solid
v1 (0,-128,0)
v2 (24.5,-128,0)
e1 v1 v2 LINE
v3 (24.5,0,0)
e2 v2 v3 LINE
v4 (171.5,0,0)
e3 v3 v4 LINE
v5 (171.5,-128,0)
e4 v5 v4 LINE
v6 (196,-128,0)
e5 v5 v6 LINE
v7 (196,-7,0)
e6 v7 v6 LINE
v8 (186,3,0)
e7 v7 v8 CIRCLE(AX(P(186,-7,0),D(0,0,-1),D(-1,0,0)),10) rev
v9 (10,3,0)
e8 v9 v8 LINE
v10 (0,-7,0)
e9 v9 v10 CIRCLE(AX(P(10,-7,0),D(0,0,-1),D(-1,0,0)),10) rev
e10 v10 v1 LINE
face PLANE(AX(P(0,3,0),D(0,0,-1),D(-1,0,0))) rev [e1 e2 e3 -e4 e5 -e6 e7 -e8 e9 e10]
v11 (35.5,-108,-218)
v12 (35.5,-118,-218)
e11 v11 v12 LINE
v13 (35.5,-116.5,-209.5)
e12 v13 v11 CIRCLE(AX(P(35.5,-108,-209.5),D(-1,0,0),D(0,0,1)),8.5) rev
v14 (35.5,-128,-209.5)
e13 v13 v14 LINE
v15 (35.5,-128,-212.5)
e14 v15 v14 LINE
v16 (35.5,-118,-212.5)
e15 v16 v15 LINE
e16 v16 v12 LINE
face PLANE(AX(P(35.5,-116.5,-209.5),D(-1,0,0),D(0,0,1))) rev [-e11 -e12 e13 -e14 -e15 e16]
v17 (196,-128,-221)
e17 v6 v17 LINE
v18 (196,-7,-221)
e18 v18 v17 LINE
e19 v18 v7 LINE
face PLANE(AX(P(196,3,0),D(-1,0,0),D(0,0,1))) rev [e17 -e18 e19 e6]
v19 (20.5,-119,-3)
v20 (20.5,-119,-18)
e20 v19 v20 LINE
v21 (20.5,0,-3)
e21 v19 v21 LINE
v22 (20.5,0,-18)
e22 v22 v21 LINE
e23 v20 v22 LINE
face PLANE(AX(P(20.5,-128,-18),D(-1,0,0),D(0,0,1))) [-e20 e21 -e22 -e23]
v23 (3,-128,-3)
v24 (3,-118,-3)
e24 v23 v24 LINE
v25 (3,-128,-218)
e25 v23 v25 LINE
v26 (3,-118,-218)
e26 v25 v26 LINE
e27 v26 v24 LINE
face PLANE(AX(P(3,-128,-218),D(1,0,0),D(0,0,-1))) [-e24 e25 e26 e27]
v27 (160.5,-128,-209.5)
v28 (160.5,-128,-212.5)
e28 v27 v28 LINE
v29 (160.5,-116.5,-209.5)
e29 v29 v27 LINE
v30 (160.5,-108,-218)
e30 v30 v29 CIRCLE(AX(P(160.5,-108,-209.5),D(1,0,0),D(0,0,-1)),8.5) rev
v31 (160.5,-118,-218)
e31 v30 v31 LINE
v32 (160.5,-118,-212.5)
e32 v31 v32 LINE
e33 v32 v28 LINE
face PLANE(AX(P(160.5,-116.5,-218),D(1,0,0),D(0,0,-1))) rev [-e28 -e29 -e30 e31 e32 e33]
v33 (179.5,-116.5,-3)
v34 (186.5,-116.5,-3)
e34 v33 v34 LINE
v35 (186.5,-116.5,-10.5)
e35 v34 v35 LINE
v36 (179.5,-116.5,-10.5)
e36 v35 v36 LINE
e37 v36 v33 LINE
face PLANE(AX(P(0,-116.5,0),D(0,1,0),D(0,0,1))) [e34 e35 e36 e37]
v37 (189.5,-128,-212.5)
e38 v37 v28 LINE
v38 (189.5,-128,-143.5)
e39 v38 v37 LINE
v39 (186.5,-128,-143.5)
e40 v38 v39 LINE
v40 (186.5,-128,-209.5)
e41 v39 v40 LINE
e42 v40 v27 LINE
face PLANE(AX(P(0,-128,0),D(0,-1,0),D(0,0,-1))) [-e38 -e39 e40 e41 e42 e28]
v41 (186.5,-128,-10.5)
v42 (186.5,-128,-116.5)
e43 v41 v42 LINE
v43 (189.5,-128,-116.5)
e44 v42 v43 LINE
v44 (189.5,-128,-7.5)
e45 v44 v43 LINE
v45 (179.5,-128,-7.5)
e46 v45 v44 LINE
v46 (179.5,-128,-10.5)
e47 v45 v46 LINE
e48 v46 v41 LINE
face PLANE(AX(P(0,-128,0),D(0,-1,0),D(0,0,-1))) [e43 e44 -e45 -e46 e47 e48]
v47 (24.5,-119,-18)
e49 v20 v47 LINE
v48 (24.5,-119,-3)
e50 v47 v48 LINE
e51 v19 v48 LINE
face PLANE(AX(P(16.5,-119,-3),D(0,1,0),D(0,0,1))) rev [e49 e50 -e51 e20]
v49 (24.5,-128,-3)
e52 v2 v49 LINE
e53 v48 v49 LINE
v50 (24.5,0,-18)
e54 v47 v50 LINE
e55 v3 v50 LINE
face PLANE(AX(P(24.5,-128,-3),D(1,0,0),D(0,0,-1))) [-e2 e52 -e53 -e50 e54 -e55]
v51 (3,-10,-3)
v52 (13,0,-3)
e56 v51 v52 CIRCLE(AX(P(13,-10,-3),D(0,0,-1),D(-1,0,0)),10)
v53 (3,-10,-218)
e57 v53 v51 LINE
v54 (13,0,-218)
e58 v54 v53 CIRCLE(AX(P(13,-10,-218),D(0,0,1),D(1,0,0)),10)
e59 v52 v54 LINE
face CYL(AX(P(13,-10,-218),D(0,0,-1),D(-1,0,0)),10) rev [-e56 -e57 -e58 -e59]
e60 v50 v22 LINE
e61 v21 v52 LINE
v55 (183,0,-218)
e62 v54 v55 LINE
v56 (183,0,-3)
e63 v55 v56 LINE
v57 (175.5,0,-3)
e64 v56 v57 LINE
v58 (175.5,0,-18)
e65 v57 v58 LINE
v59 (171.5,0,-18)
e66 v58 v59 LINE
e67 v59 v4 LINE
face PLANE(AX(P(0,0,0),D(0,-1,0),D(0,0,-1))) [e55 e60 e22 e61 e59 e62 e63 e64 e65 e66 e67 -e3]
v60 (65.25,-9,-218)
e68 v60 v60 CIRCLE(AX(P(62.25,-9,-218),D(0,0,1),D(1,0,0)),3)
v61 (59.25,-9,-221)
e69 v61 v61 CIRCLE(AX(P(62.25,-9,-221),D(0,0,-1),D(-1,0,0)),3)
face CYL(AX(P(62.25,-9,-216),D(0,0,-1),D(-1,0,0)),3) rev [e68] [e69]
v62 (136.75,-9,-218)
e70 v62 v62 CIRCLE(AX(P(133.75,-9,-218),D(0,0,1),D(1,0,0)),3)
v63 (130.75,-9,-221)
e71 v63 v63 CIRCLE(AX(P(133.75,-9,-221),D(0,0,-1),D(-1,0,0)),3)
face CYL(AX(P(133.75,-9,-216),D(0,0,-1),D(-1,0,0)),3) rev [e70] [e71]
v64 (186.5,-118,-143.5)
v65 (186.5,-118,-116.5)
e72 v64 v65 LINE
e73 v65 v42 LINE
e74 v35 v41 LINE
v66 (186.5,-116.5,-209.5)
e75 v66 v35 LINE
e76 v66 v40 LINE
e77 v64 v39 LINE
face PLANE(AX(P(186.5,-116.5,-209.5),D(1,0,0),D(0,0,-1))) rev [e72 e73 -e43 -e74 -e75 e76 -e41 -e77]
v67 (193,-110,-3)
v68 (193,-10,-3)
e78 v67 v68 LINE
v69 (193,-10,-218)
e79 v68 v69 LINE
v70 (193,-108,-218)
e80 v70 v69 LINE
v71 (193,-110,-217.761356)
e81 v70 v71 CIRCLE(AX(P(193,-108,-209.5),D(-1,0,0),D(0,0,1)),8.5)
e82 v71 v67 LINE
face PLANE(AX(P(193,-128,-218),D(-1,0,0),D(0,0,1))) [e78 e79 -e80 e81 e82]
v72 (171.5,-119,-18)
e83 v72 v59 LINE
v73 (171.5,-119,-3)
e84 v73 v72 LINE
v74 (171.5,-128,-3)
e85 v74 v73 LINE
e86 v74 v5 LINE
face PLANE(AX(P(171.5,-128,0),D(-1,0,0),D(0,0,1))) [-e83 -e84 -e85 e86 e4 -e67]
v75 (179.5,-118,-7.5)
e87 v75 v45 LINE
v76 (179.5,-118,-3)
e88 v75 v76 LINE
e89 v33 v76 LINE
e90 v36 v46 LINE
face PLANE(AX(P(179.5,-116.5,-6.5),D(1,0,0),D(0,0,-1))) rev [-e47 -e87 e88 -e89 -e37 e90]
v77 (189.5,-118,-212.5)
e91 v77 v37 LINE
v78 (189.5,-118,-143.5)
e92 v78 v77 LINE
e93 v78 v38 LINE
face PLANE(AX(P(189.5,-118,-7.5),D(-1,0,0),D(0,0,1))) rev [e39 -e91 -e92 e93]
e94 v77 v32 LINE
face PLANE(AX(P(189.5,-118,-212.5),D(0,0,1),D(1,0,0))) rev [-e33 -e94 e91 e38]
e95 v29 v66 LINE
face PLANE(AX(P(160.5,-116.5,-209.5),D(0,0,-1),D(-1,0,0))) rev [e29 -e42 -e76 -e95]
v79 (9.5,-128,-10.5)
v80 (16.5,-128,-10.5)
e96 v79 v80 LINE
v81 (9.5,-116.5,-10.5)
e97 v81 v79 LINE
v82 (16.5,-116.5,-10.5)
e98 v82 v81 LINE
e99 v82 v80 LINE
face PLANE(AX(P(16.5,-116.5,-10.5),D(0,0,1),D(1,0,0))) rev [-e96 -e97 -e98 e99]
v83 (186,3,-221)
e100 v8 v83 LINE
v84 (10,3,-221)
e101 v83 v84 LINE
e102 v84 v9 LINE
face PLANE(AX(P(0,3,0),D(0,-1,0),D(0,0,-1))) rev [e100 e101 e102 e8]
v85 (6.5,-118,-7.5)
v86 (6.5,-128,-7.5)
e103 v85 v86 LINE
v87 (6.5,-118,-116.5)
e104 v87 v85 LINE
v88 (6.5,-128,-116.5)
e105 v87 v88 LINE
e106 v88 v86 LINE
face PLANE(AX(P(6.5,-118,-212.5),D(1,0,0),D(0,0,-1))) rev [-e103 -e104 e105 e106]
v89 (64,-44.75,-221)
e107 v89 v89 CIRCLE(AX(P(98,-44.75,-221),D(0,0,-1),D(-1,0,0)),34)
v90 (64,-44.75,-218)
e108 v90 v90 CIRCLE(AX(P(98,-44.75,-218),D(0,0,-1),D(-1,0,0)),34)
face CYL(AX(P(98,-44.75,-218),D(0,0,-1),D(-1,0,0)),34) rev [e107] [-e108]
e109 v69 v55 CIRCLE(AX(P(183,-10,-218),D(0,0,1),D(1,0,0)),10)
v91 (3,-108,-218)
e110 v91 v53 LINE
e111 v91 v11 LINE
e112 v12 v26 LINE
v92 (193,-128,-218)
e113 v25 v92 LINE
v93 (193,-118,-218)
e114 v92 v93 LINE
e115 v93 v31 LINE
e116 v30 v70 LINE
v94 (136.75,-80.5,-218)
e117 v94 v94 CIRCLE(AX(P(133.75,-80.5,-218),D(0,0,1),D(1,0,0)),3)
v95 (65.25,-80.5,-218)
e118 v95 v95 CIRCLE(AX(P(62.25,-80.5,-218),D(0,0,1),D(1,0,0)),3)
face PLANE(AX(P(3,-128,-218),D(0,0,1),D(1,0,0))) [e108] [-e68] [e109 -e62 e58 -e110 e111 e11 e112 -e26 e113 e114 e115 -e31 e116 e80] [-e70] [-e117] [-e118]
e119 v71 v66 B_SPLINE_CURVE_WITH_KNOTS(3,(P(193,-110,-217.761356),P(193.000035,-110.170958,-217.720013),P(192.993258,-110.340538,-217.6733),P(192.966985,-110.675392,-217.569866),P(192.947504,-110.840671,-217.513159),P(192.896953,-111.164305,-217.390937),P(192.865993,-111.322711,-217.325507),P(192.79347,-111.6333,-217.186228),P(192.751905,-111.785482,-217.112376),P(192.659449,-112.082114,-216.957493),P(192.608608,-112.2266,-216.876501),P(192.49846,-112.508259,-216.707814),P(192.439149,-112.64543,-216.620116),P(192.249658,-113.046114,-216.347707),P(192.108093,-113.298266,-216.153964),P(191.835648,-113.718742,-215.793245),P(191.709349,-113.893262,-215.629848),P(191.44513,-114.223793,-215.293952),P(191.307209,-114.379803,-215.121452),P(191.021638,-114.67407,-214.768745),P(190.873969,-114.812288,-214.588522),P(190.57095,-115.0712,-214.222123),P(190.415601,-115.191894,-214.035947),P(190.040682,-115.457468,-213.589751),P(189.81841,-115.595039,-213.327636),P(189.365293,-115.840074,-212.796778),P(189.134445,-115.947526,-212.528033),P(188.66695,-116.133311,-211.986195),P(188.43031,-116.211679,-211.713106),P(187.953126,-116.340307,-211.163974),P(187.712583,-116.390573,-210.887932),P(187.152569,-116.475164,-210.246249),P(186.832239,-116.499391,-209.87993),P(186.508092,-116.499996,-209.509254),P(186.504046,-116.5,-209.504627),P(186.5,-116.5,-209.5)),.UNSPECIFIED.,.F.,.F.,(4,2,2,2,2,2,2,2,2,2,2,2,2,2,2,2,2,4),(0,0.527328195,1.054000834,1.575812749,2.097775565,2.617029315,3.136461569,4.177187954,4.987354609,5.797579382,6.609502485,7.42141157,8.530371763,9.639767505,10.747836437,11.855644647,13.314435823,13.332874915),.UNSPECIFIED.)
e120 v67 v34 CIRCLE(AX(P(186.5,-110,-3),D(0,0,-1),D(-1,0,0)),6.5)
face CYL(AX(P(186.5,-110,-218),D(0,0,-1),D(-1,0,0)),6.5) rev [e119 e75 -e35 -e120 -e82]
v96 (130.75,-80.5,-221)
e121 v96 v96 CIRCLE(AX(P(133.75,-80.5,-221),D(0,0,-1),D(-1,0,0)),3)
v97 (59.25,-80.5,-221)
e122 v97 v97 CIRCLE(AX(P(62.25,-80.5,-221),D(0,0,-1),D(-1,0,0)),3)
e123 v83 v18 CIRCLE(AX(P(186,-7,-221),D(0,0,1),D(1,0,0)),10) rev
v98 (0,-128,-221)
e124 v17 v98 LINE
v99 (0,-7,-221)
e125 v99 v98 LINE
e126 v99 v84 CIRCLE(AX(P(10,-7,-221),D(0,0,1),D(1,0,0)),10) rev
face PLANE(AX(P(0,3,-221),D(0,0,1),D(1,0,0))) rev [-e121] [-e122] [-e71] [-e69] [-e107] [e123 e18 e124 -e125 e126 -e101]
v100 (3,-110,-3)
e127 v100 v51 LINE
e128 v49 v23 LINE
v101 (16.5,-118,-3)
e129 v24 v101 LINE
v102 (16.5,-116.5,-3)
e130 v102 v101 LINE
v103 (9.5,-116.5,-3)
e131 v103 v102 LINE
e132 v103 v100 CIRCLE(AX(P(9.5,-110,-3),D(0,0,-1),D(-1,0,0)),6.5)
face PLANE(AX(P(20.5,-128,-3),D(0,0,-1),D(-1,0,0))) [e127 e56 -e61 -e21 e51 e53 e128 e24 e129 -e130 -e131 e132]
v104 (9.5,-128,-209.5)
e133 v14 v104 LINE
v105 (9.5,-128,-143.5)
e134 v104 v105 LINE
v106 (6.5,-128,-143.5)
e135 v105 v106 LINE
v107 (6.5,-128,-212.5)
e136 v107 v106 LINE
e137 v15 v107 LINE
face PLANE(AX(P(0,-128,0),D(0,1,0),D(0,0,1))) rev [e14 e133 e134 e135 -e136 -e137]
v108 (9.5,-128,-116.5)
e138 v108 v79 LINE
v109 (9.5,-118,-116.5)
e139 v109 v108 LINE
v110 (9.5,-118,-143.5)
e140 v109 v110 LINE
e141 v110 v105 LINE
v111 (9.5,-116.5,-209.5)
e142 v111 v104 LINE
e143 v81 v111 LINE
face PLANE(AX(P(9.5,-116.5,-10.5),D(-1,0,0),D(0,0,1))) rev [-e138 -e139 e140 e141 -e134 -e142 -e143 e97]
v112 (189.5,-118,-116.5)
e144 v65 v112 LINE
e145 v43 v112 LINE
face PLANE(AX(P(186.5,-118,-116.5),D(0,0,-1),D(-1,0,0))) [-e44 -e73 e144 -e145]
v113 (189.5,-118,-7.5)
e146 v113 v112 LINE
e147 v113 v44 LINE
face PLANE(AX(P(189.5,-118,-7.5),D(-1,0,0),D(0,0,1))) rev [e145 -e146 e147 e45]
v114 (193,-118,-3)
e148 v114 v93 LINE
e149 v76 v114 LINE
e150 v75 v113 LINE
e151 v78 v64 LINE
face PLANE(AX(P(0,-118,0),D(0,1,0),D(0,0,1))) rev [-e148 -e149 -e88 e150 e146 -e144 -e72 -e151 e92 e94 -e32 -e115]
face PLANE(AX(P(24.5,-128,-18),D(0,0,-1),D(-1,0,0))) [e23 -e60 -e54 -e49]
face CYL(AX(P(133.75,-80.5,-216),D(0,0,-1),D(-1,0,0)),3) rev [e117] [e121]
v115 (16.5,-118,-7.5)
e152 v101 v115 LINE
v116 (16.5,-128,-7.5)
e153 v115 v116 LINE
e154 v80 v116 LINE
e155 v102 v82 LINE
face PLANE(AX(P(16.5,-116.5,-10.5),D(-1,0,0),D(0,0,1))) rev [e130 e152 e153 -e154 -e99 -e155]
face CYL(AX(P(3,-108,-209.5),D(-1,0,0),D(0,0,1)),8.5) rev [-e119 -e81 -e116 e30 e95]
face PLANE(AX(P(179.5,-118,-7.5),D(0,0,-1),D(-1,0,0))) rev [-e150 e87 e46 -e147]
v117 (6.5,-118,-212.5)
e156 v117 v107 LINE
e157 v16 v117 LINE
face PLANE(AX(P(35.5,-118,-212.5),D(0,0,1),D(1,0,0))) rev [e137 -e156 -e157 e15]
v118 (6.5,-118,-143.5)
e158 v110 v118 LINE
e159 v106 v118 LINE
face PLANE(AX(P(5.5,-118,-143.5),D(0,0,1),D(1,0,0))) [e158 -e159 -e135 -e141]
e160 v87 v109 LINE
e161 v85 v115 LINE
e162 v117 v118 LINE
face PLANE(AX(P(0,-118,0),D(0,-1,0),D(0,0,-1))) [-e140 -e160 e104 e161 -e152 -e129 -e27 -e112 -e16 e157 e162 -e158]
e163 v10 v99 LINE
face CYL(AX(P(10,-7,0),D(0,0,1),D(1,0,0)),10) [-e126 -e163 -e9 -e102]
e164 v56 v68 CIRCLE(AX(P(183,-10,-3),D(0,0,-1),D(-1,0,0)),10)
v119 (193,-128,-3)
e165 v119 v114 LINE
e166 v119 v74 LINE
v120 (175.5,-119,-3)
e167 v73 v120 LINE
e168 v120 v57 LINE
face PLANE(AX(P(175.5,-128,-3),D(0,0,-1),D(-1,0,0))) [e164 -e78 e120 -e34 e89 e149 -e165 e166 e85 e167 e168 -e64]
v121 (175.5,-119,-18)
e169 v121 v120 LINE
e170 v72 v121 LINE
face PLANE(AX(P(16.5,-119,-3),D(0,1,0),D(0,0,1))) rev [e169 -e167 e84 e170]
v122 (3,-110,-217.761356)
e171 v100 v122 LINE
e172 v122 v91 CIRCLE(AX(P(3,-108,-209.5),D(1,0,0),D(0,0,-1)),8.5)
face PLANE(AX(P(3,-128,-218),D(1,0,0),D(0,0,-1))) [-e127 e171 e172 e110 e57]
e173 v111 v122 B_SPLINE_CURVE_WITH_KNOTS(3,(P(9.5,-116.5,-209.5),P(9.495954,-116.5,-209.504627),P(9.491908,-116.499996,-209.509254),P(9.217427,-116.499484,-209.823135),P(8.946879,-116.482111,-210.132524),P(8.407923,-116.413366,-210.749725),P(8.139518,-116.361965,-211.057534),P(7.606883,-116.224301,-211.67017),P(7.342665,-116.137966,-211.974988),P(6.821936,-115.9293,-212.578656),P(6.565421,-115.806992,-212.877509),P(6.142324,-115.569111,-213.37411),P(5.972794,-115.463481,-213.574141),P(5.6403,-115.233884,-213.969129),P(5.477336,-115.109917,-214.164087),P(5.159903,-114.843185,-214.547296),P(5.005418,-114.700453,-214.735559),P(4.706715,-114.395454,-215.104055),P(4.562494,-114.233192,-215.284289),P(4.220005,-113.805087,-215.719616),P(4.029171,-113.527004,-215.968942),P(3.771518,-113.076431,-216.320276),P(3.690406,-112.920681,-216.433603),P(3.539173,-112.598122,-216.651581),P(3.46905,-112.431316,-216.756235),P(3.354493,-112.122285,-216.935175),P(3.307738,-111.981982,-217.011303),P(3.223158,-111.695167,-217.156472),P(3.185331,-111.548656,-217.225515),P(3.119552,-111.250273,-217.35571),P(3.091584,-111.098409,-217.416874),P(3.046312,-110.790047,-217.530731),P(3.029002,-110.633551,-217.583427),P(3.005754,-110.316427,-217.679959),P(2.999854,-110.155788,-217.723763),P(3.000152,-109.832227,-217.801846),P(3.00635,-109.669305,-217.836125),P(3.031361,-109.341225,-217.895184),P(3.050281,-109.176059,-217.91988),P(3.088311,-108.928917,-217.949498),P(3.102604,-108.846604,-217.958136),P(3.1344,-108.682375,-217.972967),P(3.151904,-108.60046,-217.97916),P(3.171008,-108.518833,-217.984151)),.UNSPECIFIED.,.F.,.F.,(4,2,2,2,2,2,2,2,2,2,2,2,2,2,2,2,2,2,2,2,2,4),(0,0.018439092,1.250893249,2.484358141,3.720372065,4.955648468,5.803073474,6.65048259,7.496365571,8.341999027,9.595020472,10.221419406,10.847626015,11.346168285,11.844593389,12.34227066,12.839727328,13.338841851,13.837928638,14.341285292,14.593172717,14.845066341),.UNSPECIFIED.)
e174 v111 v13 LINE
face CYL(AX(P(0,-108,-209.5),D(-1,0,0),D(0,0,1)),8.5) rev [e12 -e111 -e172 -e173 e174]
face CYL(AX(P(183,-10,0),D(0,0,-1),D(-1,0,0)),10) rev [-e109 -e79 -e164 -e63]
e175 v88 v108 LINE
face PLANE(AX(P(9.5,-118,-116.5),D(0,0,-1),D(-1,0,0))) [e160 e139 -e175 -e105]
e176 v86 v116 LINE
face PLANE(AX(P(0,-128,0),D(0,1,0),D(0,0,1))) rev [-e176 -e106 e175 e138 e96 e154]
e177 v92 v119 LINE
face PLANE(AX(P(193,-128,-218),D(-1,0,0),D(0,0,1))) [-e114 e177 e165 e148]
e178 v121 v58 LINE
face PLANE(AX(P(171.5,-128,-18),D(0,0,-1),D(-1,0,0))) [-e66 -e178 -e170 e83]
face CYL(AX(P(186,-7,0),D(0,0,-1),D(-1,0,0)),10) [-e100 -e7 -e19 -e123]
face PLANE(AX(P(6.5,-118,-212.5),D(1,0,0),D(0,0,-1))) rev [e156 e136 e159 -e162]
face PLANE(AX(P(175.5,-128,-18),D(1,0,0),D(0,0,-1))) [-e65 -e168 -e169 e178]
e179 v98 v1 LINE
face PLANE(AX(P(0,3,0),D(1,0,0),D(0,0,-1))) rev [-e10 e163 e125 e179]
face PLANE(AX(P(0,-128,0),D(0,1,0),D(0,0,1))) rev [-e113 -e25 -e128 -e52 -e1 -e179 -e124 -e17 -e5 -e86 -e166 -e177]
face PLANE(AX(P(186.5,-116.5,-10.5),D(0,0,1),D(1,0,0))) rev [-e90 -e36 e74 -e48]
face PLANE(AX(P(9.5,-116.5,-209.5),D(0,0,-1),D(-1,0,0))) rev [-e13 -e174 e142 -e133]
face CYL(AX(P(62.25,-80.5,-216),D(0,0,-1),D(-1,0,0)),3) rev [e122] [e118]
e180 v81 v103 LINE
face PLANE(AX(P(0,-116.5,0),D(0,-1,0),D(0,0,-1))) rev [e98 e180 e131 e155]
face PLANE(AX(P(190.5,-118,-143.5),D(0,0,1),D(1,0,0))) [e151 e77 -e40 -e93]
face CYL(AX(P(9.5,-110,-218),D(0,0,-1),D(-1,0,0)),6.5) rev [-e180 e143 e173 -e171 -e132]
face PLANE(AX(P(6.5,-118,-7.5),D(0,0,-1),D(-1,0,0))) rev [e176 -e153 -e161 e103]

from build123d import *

# Parameters (mm, degrees)
SKETCH_1_W          = 196
SKETCH_1_H          = 221
EXTRUDE_1_DEPTH     = 3
EXTRUDE_2_DEPTH     = 128
FILLET_1_R          = 10
FILLET_2_R          = 10
SKETCH_3_R          = 3
SKETCH_3_R_2        = 40
CUT_EXTRUDE_1_DEPTH = 5
FILLET_3_R          = 10
FILLET_4_R          = 10
SKETCH_5_R          = 40
SKETCH_5_R_2        = 34
EXTRUDE_3_DEPTH     = 3
SKETCH_6_W          = 15
SKETCH_6_H          = 9
CUT_EXTRUDE_3_DEPTH = 159
EXTRUDE_4_DEPTH     = 10
EXTRUDE_4_2_DEPTH   = 10
EXTRUDE_4_3_DEPTH   = 10
EXTRUDE_4_4_DEPTH   = 10
EXTRUDE_6_DEPTH     = 1.5
FILLET_START        = -219
FILLET_6_DEPTH      = 216
FILLET_7_R          = 6.5
FILLET_8_R          = 8.5
FILLET_9_R          = 8.5
CUT_EXTRUDE_4_DEPTH = 10


with BuildPart() as part:
    # 草图1 → 凸台-拉伸1 (new body)
    with BuildSketch(Plane(origin=(0, 0, 0), x_dir=(1, 0, 0), z_dir=(0, 1, 0))):
        with Locations((98, 110.5)):
            Rectangle(SKETCH_1_W, SKETCH_1_H)
    extrude(amount=EXTRUDE_1_DEPTH)

    # 草图2 → 凸台-拉伸2 (add)
    with BuildSketch(Plane(origin=(0, 0, 0), x_dir=(1, 0, 0), z_dir=(0, 1, 0))):
        Polygon((3, 218), (3, 3), (20.5, 3), (20.5, 18), (24.5, 18), (24.5, 3), (24.5, 0), (0, 0), (0, 221), (196, 221), (196, 0), (171.5, 0), (171.5, 3), (171.5, 18), (175.5, 18), (175.5, 3), (193, 3), (193, 218), align=None)
    extrude(amount=-EXTRUDE_2_DEPTH)

    # 圆角1
    fillet_1_edges = [part.edges().sort_by_distance(p)[0] for p in [
        (0, 3, -110.5),
    ]]
    fillet(fillet_1_edges, radius=FILLET_1_R)

    # 圆角2
    fillet_2_edges = [part.edges().sort_by_distance(p)[0] for p in [
        (196, 3, -110.5),
    ]]
    fillet(fillet_2_edges, radius=FILLET_2_R)

    # 草图3 → 切除-拉伸1 (cut)
    with BuildSketch(Plane(origin=(0, 0, -221), x_dir=(-1, 0, 0), z_dir=(0, 0, -1))):
        with Locations((-133.75, -9)):
            Circle(SKETCH_3_R)
        with Locations((-62.25, -9)):
            Circle(SKETCH_3_R)
        with Locations((-62.25, -80.5)):
            Circle(SKETCH_3_R)
        with Locations((-133.75, -80.5)):
            Circle(SKETCH_3_R)
        with Locations((-98, -44.75)):
            Circle(SKETCH_3_R_2)
    extrude(amount=-CUT_EXTRUDE_1_DEPTH, mode=Mode.SUBTRACT)

    # 圆角3
    fillet_3_edges = [part.edges().sort_by_distance(p)[0] for p in [
        (193, 0, -110.5),
    ]]
    fillet(fillet_3_edges, radius=FILLET_3_R)

    # 圆角4
    fillet_4_edges = [part.edges().sort_by_distance(p)[0] for p in [
        (3, 0, -110.5),
    ]]
    fillet(fillet_4_edges, radius=FILLET_4_R)

    # 草图5 → 凸台-拉伸3 (add)
    with BuildSketch(Plane(origin=(0, 0, -221), x_dir=(-1, 0, 0), z_dir=(0, 0, -1))):
        with Locations((-98, -44.75)):
            Circle(SKETCH_5_R)
        with Locations((-98, -44.75)):
            Circle(SKETCH_5_R_2, mode=Mode.SUBTRACT)
    extrude(amount=-EXTRUDE_3_DEPTH)

    # 草图6 → 切除-拉伸3 (cut)
    with BuildSketch(Plane(origin=(175.5, 0, 0), x_dir=(0, 0, -1), z_dir=(1, 0, 0))):
        with Locations((10.5, -123.5)):
            Rectangle(SKETCH_6_W, SKETCH_6_H)
    extrude(amount=-CUT_EXTRUDE_3_DEPTH, mode=Mode.SUBTRACT)



with BuildPart() as body_2:
    # 草图10 → 凸台-拉伸4 (new body)
    with BuildSketch(Plane(origin=(0, -128, 0), x_dir=(-1, 0, 0), z_dir=(0, -1, 0))):
        Polygon((-5.5, 213.5), (-5.5, 143.5), (-9.5, 143.5), (-9.5, 209.5), (-35.5, 209.5), (-35.5, 213.5), align=None)
    extrude(amount=-EXTRUDE_4_DEPTH)


with BuildPart() as body_3:
    # 草图10 → Extrude 4 2 (new body)
    with BuildSketch(Plane(origin=(0, -128, 0), x_dir=(-1, 0, 0), z_dir=(0, -1, 0))):
        Polygon((-190.5, 213.5), (-160.5, 213.5), (-160.5, 209.5), (-186.5, 209.5), (-186.5, 143.5), (-190.5, 143.5), align=None)
    extrude(amount=-EXTRUDE_4_2_DEPTH)


with BuildPart() as body_4:
    # 草图10 → Extrude 4 3 (new body)
    with BuildSketch(Plane(origin=(0, -128, 0), x_dir=(-1, 0, 0), z_dir=(0, -1, 0))):
        Polygon((-16.5, 6.5), (-16.5, 10.5), (-9.5, 10.5), (-9.5, 116.5), (-5.5, 116.5), (-5.5, 6.5), align=None)
    extrude(amount=-EXTRUDE_4_3_DEPTH)


with BuildPart() as body_5:
    # 草图10 → Extrude 4 4 (new body)
    with BuildSketch(Plane(origin=(0, -128, 0), x_dir=(-1, 0, 0), z_dir=(0, -1, 0))):
        Polygon((-190.5, 6.5), (-179.5, 6.5), (-179.5, 10.5), (-186.5, 10.5), (-186.5, 116.5), (-190.5, 116.5), align=None)
    extrude(amount=-EXTRUDE_4_4_DEPTH)


with BuildPart() as part_1:
    add(part.part)

    add(body_2.part)  # 凸台-拉伸6 merges body 2

    add(body_3.part)  # 凸台-拉伸6 merges body 3

    add(body_4.part)  # 凸台-拉伸6 merges body 4

    add(body_5.part)  # 凸台-拉伸6 merges body 5
    # 草图11 → 凸台-拉伸6 (add)
    with BuildSketch(Plane(origin=(0, -118, 0), x_dir=(1, 0, 0), z_dir=(0, 1, 0))):
        Polygon((179.5, 6.5), (179.5, 3), (193, 3), (193, 218), (160.5, 218), (160.5, 209.5), (186.5, 209.5), (186.5, 10.5), (179.5, 10.5), align=None)
        Polygon((16.5, 10.5), (16.5, 3), (3, 3), (3, 218), (35.5, 218), (35.5, 209.5), (9.5, 209.5), (9.5, 10.5), align=None)
    extrude(amount=EXTRUDE_6_DEPTH)

    # 圆角6: read off the stored shape, not the designer's step
    # 圆角6 outline → 圆角6 (add)
    with BuildSketch(Plane.XY.offset(FILLET_START)):
        with BuildLine():
            Line((3, -116.5), (9.5, -116.5))
            ThreePointArc((9.5, -116.5), (4.903805922, -114.596194078), (3, -110))
            Line((3, -110), (3, -116.5))
        make_face()
    extrude(amount=FILLET_6_DEPTH)

    # 圆角7
    fillet_7_edges = [part_1.edges().sort_by_distance(p)[0] for p in [
        (193, -116.5, -110.5),
    ]]
    fillet(fillet_7_edges, radius=FILLET_7_R - 0.0001)  # a hair under: the kernel refuses the full size

    # 圆角8
    # the kernel refuses this fillet: 8.5 mm, written as the material it adds along each edge
    with BuildSketch(Plane(origin=(-11.75, -116.5, -218), x_dir=(0, 1, 0), z_dir=(1, 0, 0))) as fillet_8_piece_1_section:
        with BuildLine():
            CenterArc((FILLET_8_R, FILLET_8_R), FILLET_8_R, 180, 90)
            Line((0, FILLET_8_R), (0, 0))
            Line((0, 0), (FILLET_8_R, 0))
        make_face()
    fillet_8_piece_1 = extrude(amount=47.25, mode=Mode.PRIVATE)
    fillet_8_piece_1 = split(fillet_8_piece_1, bisect_by=Plane(origin=(0, -116.5, -218), z_dir=(1, 0, 0)), keep=Keep.TOP, mode=Mode.PRIVATE)
    add(fillet_8_piece_1)

    # 圆角9
    # the kernel refuses this fillet: 8.5 mm, written as the material it adds along each edge
    with BuildSketch(Plane(origin=(207.7501, -116.5, -218), x_dir=(0, 0, 1), z_dir=(-1, 0, 0))) as fillet_9_piece_1_section:
        with BuildLine():
            CenterArc((FILLET_9_R, FILLET_9_R), FILLET_9_R, 180, 90)
            Line((0, FILLET_9_R), (0, 0))
            Line((0, 0), (FILLET_9_R, 0))
        make_face()
    fillet_9_piece_1 = extrude(amount=47.2501, mode=Mode.PRIVATE)
    fillet_9_piece_1 = split(fillet_9_piece_1, bisect_by=Plane(origin=(196, -116.5, -218), z_dir=(-1, 0, 0)), keep=Keep.TOP, mode=Mode.PRIVATE)
    add(fillet_9_piece_1)

    # 草图12 → 切除-拉伸4 (cut)
    with BuildSketch(Plane(origin=(0, -128, 0), x_dir=(-1, 0, 0), z_dir=(0, -1, 0))):
        Polygon((-16.5, 6.5), (-5.5, 6.5), (-5.5, 213.5), (-35.5, 213.5), (-35.5, 212.5), (-6.5, 212.5), (-6.5, 7.5), (-16.5, 7.5), align=None)
        Polygon((-190.5, 213.5), (-190.5, 6.5), (-179.5, 6.5), (-179.5, 7.5), (-189.5, 7.5), (-189.5, 212.5), (-160.5, 212.5), (-160.5, 213), (-160.5, 213.5), align=None)
    extrude(amount=-CUT_EXTRUDE_4_DEPTH, mode=Mode.SUBTRACT)


solid = part_1.part
